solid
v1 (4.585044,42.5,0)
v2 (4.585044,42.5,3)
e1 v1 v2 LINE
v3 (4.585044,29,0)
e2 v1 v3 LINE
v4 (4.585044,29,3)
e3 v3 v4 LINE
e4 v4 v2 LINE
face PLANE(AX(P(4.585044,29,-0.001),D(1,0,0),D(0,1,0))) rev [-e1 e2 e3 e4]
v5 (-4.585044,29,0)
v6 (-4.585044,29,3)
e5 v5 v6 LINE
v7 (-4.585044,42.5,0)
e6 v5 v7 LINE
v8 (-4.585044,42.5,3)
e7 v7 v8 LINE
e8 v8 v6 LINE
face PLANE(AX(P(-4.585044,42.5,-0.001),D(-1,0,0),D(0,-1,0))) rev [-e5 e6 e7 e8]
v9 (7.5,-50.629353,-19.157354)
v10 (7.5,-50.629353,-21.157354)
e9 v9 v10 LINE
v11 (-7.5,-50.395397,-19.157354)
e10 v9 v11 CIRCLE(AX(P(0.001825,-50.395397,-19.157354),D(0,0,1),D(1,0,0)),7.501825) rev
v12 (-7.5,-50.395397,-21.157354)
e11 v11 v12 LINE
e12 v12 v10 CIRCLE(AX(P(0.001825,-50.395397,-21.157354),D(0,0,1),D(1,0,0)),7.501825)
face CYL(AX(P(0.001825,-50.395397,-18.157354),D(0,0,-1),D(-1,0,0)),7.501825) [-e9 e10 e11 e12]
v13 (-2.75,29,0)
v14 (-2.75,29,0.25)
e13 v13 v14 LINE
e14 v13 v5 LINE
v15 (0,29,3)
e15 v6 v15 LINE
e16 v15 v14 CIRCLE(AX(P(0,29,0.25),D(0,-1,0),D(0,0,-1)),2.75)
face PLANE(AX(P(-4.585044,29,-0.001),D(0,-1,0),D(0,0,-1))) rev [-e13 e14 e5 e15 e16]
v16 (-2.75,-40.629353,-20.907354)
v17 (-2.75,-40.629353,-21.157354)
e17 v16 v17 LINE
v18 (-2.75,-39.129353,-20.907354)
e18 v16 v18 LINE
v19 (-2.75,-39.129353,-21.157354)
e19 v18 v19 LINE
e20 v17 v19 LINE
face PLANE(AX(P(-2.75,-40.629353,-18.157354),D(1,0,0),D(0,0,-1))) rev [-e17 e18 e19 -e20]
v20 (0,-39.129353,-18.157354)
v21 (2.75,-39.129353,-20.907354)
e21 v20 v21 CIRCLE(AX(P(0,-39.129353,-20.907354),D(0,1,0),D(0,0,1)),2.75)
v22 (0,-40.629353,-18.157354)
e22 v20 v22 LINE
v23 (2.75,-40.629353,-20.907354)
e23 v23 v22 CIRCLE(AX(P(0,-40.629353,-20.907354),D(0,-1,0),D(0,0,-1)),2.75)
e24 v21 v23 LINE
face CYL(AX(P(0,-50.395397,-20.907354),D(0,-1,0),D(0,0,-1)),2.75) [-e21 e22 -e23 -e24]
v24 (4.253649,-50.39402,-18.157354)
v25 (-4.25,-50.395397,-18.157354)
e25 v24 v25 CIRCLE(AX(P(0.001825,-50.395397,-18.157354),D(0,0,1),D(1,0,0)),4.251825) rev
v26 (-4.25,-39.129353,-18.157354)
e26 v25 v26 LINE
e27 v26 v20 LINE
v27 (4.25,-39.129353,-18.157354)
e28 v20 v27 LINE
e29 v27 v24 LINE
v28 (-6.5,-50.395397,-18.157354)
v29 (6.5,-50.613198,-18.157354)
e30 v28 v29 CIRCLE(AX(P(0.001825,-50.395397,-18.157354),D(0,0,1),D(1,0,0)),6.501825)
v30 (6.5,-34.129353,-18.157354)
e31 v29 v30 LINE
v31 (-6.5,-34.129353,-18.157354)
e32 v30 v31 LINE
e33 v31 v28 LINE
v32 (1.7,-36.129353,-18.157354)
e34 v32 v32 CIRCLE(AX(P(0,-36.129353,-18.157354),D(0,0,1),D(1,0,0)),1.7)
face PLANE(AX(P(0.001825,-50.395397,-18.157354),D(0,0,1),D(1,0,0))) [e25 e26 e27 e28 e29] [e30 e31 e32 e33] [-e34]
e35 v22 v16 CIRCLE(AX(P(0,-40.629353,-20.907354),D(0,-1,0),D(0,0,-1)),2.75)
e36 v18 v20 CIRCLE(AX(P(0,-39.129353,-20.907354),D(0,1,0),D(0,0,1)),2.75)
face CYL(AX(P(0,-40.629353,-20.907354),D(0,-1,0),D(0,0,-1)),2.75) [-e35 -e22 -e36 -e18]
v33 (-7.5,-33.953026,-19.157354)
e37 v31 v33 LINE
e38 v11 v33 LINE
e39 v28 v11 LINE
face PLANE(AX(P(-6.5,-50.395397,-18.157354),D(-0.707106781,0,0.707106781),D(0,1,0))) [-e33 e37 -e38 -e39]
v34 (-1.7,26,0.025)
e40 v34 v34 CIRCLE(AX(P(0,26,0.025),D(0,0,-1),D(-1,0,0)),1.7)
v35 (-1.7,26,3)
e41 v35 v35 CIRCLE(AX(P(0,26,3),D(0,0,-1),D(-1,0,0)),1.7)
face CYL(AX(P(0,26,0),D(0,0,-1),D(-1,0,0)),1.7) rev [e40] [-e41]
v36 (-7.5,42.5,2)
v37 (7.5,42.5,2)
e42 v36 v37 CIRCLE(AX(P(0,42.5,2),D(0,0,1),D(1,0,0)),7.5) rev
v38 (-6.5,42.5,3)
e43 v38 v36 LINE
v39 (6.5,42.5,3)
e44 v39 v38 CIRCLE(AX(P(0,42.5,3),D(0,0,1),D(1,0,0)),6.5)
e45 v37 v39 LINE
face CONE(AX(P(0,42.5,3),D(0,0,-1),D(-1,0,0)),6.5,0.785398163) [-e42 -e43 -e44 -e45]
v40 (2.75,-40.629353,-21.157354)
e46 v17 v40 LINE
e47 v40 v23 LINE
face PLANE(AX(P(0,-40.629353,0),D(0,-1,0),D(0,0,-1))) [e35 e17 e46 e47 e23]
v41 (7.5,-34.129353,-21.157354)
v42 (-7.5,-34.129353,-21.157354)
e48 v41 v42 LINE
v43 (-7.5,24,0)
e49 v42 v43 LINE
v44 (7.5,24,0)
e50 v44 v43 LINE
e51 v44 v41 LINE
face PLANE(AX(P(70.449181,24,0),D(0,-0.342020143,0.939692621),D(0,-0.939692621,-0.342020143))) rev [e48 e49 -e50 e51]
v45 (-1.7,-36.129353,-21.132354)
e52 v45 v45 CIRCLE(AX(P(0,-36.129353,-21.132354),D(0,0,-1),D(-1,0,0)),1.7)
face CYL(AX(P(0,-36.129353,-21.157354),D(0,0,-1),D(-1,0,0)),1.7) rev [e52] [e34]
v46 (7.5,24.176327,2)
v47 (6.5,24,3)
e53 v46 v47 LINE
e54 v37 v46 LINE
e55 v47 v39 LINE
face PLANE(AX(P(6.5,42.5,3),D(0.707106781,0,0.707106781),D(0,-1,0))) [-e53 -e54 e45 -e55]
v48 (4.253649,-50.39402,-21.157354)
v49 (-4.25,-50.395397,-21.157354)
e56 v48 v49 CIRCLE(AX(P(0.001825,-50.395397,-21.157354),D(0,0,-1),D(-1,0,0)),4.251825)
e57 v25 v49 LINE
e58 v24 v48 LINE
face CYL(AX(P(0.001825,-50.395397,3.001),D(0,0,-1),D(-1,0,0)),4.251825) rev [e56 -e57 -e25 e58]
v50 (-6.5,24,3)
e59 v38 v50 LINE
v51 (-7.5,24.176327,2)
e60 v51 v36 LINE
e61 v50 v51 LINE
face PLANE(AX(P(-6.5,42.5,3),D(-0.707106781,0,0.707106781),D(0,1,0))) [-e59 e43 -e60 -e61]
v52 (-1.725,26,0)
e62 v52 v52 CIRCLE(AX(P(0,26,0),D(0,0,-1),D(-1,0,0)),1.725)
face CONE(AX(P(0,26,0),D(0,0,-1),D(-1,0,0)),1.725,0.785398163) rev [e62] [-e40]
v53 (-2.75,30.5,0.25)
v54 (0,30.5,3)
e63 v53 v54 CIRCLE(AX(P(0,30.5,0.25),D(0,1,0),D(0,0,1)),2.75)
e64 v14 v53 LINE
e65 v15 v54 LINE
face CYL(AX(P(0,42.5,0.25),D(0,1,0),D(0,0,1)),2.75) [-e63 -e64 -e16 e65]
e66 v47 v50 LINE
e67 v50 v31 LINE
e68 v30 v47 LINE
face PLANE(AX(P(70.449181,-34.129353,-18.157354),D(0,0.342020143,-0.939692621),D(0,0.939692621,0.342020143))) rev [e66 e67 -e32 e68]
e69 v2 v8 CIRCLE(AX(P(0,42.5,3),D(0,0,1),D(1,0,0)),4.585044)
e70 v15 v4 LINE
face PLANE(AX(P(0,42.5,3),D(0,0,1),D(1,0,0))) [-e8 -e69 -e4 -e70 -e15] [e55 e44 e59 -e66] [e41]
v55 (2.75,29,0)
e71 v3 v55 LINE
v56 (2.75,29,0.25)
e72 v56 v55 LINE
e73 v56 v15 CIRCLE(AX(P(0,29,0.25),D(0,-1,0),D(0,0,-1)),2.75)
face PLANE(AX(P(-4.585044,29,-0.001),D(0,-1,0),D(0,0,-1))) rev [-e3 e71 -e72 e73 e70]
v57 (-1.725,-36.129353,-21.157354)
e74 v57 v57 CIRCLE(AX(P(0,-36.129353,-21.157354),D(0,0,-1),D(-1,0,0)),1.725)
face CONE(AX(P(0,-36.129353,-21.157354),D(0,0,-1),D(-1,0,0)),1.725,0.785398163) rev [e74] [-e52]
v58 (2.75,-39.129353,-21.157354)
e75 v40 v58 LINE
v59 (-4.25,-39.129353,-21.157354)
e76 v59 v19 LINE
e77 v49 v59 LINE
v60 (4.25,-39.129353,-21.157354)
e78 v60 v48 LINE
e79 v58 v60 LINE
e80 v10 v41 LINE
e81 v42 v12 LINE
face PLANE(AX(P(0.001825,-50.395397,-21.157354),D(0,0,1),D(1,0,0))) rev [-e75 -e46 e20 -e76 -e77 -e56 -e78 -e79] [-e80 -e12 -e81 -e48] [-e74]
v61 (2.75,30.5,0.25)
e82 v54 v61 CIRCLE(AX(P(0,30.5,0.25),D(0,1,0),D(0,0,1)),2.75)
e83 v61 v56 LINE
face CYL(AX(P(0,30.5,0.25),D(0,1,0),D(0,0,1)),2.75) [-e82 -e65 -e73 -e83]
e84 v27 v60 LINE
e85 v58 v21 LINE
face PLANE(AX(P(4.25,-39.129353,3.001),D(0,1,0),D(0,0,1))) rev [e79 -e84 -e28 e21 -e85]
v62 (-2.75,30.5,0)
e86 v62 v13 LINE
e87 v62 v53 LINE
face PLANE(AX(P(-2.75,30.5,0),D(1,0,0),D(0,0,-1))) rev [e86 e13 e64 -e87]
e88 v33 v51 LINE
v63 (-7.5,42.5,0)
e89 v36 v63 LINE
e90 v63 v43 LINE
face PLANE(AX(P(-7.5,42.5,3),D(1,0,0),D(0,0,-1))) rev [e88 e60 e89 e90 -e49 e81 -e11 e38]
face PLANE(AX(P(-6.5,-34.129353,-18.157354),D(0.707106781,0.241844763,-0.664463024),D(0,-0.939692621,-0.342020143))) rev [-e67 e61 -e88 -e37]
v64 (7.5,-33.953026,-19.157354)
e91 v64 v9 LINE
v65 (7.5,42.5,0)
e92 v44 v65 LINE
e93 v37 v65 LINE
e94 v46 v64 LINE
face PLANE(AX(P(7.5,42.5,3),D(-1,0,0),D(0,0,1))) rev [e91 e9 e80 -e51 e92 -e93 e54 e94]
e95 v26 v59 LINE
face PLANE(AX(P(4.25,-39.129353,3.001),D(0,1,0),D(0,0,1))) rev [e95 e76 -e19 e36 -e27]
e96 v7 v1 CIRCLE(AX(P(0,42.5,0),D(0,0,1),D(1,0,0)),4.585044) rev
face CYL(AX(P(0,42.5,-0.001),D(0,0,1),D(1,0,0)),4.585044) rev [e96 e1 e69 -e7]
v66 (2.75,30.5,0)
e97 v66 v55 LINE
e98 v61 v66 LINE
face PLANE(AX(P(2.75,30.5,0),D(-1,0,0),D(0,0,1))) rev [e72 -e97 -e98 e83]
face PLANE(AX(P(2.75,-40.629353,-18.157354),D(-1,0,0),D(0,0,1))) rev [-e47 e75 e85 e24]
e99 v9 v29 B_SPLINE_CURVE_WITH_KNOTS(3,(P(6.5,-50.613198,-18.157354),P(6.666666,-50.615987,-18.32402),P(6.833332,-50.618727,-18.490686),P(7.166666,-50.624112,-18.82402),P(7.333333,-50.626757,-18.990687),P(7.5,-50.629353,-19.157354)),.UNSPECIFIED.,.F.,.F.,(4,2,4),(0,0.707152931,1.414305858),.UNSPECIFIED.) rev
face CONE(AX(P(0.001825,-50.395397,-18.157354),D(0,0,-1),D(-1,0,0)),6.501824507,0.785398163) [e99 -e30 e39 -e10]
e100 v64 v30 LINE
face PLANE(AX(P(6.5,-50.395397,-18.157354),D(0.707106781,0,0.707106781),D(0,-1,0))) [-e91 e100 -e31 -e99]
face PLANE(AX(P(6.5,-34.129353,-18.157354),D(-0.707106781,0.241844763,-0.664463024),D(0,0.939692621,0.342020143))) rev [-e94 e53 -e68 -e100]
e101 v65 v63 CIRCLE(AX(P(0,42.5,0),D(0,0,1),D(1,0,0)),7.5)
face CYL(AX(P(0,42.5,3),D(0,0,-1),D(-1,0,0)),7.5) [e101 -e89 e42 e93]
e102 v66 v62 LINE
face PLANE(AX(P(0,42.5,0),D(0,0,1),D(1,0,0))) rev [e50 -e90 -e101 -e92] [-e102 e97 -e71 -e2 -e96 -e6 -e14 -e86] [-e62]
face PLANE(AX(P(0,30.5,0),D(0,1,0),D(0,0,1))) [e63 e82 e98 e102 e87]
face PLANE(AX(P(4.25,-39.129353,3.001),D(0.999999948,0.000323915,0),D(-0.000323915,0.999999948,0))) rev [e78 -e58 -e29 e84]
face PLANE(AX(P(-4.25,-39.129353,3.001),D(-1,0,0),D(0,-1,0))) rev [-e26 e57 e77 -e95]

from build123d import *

# Parameters (mm, degrees)
BOSS_EXTRUDE1_DEPTH            = 3
CUT_EXTRUDE1_REACH             = 52.648
SKETCH3_W                      = 5.5
SKETCH3_H                      = 3
BOSS_EXTRUDE2_DEPTH            = 1.5
CUT_EXTRUDE2_REACH             = 52.648
SKETCH4_W                      = 6.851042423
SKETCH4_H                      = 79.503772781
CUT_EXTRUDE2_DIRECTION_2_REACH = 52.648
BOSS_EXTRUDE3_DEPTH            = 7.5
BOSS_EXTRUDE3_DEPTH_BACK       = 7.5
BOSS_EXTRUDE5_DEPTH            = 3
CUT_EXTRUDE3_REACH             = 65.182
SKETCH10_W                     = 5.5
SKETCH10_H                     = 3
BOSS_EXTRUDE6_DEPTH            = 1.5
FILLET2_R                      = 2.75
M3_CLEARANCE_HOLE1_D           = 3.4
M3_CLEARANCE_HOLE1_CSINK_D     = 3.45
M3_CLEARANCE_HOLE1_CSINK_ANGLE = 90
M3_CLEARANCE_HOLE2_D           = 3.4
M3_CLEARANCE_HOLE2_CSINK_D     = 3.45
M3_CLEARANCE_HOLE2_CSINK_ANGLE = 90
CHAMFER2_SIZE                  = 1


with BuildPart() as part:
    # Sketch1 → Boss-Extrude1 (new body)
    with BuildSketch(Plane.XY):
        with BuildLine():
            Line((7.5, 42.5), (7.5, -42.5))
            ThreePointArc((7.5, -42.5), (0, -50), (-7.5, -42.5))
            Line((-7.5, -42.5), (-7.5, 42.5))
            ThreePointArc((-7.5, 42.5), (0, 50), (7.5, 42.5))
        make_face()
    extrude(amount=BOSS_EXTRUDE1_DEPTH)

    # Sketch2 → Cut-Extrude1 (cut, up to next)
    with BuildSketch(Plane.XY.offset(3), mode=Mode.PRIVATE) as cut_extrude1_sk1:
        with BuildLine():
            Line((-4.585044143, 42.5), (-4.585044143, 29))
            Line((-4.585044143, 29), (4.585044143, 29))
            Line((4.585044143, 29), (4.585044143, 42.5))
            ThreePointArc((4.585044143, 42.5), (0, 47.085044143), (-4.585044143, 42.5))
        make_face()
    cut_extrude1_tool1 = extrude(cut_extrude1_sk1.sketch, amount=-CUT_EXTRUDE1_REACH, mode=Mode.PRIVATE) & part.part
    cut_extrude1 = cut_extrude1_tool1.solids().sort_by_distance((0, 37.581163, 3))[0]
    add(cut_extrude1, mode=Mode.SUBTRACT)

    # Sketch3 → Boss-Extrude2 (add)
    with BuildSketch(Plane(origin=(0, 29, 0), x_dir=(1, 0, 0), z_dir=(0, 1, 0))):
        with Locations((0, -1.5)):
            Rectangle(SKETCH3_W, SKETCH3_H)
    boss_extrude2 = extrude(amount=BOSS_EXTRUDE2_DEPTH)

    # Mirror1: Cut-Extrude1, Boss-Extrude2 across plane
    add(cut_extrude1.mirror(Plane.ZX), mode=Mode.SUBTRACT)
    add(boss_extrude2.mirror(Plane.ZX))

    # Sketch4 → Cut-Extrude2 (cut, up to next)
    with BuildSketch(Plane(origin=(0, 0, 0), x_dir=(0, 0, -1), z_dir=(1, 0, 0)), mode=Mode.PRIVATE) as cut_extrude2_sk1:
        with Locations((-3.425521211, -15.751886391)):
            Rectangle(SKETCH4_W, SKETCH4_H)
    cut_extrude2_tool1 = extrude(cut_extrude2_sk1.sketch, amount=-CUT_EXTRUDE2_REACH, mode=Mode.PRIVATE) & part.part
    add(cut_extrude2_tool1.solids().sort_by_distance((0, -15.751886, 3.425521))[0], mode=Mode.SUBTRACT)

    # Sketch4 → Cut-Extrude2 direction 2 (cut, up to next)
    with BuildSketch(Plane(origin=(0, 0, 0), x_dir=(0, 0, -1), z_dir=(1, 0, 0)), mode=Mode.PRIVATE) as cut_extrude2_direction_2_sk1:
        with Locations((-3.425521211, -15.751886391)):
            Rectangle(SKETCH4_W, SKETCH4_H)
    cut_extrude2_direction_2_tool1 = extrude(cut_extrude2_direction_2_sk1.sketch, amount=CUT_EXTRUDE2_DIRECTION_2_REACH, mode=Mode.PRIVATE) & part.part
    add(cut_extrude2_direction_2_tool1.solids().sort_by_distance((0, -15.751886, 3.425521))[0], mode=Mode.SUBTRACT)

    # Sketch5 → Boss-Extrude3 (add, two sides: drawn at the far end of the back side and taken through both)
    with BuildSketch(Plane(origin=(0, 0, 0), x_dir=(0, 0, -1), z_dir=(1, 0, 0)).offset(-BOSS_EXTRUDE3_DEPTH_BACK)):
        Polygon((0, 24), (21.157354182, -34.12935287), (18.157354182, -34.12935287), (-3, 24), align=None)
    extrude(amount=BOSS_EXTRUDE3_DEPTH + BOSS_EXTRUDE3_DEPTH_BACK)

    # Sketch7 → Boss-Extrude5 (add)
    with BuildSketch(Plane.XY.offset(-21.157354182)):
        with BuildLine():
            Line((7.5, -34.12935287), (7.5, -50.62935287))
            ThreePointArc((7.5, -50.62935287), (-0.115167499, -57.896309511), (-7.5, -50.395397313))
            Line((-7.5, -50.395397313), (-7.5, -34.12935287))
            Line((-7.5, -34.12935287), (7.5, -34.12935287))
        make_face()
    extrude(amount=BOSS_EXTRUDE5_DEPTH)

    # Sketch9 → Cut-Extrude3 (cut, up to next)
    with BuildSketch(Plane(origin=(0, 0, -21.157354182), x_dir=(-1, 0, 0), z_dir=(0, 0, -1)), mode=Mode.PRIVATE) as cut_extrude3_sk1:
        with BuildLine():
            Line((-4.25, -39.12935287), (4.25, -39.12935287))
            Line((4.25, -39.12935287), (4.25, -50.395397313))
            ThreePointArc((4.25, -50.395397313), (-0.002513121, -54.647221764), (-4.25364879, -50.394020085))
            Line((-4.25364879, -50.394020085), (-4.25, -39.12935287))
        make_face()
    cut_extrude3_tool1 = extrude(cut_extrude3_sk1.sketch, amount=-CUT_EXTRUDE3_REACH, mode=Mode.PRIVATE) & part.part
    add(cut_extrude3_tool1.solids().sort_by_distance((0.001121, -46.463485, -21.157354))[0], mode=Mode.SUBTRACT)

    # Sketch10 → Boss-Extrude6 (add)
    with BuildSketch(Plane.XZ.offset(39.12935287)):
        with Locations((0, -19.657354182)):
            Rectangle(SKETCH10_W, SKETCH10_H)
    extrude(amount=BOSS_EXTRUDE6_DEPTH)

    # Fillet2
    fillet2_edges = [part.edges().sort_by_distance(p)[0] for p in [
        (2.75, -39.87935287, -18.157354182),
        (-2.75, -39.87935287, -18.157354182),
        (-2.75, 29.75, 3),
        (2.75, 29.75, 3),
    ]]
    fillet(fillet2_edges, radius=FILLET2_R - 0.0001)  # a hair under: the kernel refuses the full size

    # M3 Clearance Hole1 (through all)
    with Locations(Plane(origin=(0, 0, 0), x_dir=(-1, 0, 0), z_dir=(0, 0, -1))):
        with Locations((0, 26)):
            CounterSinkHole(M3_CLEARANCE_HOLE1_D / 2, M3_CLEARANCE_HOLE1_CSINK_D / 2, counter_sink_angle=M3_CLEARANCE_HOLE1_CSINK_ANGLE)

    # M3 Clearance Hole2 (through all)
    with Locations(Plane(origin=(0, 0, -21.157354182), x_dir=(-1, 0, 0), z_dir=(0, 0, -1))):
        with Locations((0, -36.12935287)):
            CounterSinkHole(M3_CLEARANCE_HOLE2_D / 2, M3_CLEARANCE_HOLE2_CSINK_D / 2, counter_sink_angle=M3_CLEARANCE_HOLE2_CSINK_ANGLE)

    # Chamfer2
    chamfer2_edges = [part.edges().sort_by_distance(p)[0] for p in [
        (7.5, -5.064676435, -7.578677091),
        (-7.5, -5.064676435, -7.578677091),
        (-7.5, -42.262375091, -18.157354182),
        (-0.115167499, -57.896309511, -18.157354182),
        (7.5, -42.37935287, -18.157354182),
        (0, 50, 3),
        (7.5, 33.25, 3),
        (-7.5, 33.25, 3),
    ]]
    chamfer(chamfer2_edges, length=CHAMFER2_SIZE)


solid = part.part
